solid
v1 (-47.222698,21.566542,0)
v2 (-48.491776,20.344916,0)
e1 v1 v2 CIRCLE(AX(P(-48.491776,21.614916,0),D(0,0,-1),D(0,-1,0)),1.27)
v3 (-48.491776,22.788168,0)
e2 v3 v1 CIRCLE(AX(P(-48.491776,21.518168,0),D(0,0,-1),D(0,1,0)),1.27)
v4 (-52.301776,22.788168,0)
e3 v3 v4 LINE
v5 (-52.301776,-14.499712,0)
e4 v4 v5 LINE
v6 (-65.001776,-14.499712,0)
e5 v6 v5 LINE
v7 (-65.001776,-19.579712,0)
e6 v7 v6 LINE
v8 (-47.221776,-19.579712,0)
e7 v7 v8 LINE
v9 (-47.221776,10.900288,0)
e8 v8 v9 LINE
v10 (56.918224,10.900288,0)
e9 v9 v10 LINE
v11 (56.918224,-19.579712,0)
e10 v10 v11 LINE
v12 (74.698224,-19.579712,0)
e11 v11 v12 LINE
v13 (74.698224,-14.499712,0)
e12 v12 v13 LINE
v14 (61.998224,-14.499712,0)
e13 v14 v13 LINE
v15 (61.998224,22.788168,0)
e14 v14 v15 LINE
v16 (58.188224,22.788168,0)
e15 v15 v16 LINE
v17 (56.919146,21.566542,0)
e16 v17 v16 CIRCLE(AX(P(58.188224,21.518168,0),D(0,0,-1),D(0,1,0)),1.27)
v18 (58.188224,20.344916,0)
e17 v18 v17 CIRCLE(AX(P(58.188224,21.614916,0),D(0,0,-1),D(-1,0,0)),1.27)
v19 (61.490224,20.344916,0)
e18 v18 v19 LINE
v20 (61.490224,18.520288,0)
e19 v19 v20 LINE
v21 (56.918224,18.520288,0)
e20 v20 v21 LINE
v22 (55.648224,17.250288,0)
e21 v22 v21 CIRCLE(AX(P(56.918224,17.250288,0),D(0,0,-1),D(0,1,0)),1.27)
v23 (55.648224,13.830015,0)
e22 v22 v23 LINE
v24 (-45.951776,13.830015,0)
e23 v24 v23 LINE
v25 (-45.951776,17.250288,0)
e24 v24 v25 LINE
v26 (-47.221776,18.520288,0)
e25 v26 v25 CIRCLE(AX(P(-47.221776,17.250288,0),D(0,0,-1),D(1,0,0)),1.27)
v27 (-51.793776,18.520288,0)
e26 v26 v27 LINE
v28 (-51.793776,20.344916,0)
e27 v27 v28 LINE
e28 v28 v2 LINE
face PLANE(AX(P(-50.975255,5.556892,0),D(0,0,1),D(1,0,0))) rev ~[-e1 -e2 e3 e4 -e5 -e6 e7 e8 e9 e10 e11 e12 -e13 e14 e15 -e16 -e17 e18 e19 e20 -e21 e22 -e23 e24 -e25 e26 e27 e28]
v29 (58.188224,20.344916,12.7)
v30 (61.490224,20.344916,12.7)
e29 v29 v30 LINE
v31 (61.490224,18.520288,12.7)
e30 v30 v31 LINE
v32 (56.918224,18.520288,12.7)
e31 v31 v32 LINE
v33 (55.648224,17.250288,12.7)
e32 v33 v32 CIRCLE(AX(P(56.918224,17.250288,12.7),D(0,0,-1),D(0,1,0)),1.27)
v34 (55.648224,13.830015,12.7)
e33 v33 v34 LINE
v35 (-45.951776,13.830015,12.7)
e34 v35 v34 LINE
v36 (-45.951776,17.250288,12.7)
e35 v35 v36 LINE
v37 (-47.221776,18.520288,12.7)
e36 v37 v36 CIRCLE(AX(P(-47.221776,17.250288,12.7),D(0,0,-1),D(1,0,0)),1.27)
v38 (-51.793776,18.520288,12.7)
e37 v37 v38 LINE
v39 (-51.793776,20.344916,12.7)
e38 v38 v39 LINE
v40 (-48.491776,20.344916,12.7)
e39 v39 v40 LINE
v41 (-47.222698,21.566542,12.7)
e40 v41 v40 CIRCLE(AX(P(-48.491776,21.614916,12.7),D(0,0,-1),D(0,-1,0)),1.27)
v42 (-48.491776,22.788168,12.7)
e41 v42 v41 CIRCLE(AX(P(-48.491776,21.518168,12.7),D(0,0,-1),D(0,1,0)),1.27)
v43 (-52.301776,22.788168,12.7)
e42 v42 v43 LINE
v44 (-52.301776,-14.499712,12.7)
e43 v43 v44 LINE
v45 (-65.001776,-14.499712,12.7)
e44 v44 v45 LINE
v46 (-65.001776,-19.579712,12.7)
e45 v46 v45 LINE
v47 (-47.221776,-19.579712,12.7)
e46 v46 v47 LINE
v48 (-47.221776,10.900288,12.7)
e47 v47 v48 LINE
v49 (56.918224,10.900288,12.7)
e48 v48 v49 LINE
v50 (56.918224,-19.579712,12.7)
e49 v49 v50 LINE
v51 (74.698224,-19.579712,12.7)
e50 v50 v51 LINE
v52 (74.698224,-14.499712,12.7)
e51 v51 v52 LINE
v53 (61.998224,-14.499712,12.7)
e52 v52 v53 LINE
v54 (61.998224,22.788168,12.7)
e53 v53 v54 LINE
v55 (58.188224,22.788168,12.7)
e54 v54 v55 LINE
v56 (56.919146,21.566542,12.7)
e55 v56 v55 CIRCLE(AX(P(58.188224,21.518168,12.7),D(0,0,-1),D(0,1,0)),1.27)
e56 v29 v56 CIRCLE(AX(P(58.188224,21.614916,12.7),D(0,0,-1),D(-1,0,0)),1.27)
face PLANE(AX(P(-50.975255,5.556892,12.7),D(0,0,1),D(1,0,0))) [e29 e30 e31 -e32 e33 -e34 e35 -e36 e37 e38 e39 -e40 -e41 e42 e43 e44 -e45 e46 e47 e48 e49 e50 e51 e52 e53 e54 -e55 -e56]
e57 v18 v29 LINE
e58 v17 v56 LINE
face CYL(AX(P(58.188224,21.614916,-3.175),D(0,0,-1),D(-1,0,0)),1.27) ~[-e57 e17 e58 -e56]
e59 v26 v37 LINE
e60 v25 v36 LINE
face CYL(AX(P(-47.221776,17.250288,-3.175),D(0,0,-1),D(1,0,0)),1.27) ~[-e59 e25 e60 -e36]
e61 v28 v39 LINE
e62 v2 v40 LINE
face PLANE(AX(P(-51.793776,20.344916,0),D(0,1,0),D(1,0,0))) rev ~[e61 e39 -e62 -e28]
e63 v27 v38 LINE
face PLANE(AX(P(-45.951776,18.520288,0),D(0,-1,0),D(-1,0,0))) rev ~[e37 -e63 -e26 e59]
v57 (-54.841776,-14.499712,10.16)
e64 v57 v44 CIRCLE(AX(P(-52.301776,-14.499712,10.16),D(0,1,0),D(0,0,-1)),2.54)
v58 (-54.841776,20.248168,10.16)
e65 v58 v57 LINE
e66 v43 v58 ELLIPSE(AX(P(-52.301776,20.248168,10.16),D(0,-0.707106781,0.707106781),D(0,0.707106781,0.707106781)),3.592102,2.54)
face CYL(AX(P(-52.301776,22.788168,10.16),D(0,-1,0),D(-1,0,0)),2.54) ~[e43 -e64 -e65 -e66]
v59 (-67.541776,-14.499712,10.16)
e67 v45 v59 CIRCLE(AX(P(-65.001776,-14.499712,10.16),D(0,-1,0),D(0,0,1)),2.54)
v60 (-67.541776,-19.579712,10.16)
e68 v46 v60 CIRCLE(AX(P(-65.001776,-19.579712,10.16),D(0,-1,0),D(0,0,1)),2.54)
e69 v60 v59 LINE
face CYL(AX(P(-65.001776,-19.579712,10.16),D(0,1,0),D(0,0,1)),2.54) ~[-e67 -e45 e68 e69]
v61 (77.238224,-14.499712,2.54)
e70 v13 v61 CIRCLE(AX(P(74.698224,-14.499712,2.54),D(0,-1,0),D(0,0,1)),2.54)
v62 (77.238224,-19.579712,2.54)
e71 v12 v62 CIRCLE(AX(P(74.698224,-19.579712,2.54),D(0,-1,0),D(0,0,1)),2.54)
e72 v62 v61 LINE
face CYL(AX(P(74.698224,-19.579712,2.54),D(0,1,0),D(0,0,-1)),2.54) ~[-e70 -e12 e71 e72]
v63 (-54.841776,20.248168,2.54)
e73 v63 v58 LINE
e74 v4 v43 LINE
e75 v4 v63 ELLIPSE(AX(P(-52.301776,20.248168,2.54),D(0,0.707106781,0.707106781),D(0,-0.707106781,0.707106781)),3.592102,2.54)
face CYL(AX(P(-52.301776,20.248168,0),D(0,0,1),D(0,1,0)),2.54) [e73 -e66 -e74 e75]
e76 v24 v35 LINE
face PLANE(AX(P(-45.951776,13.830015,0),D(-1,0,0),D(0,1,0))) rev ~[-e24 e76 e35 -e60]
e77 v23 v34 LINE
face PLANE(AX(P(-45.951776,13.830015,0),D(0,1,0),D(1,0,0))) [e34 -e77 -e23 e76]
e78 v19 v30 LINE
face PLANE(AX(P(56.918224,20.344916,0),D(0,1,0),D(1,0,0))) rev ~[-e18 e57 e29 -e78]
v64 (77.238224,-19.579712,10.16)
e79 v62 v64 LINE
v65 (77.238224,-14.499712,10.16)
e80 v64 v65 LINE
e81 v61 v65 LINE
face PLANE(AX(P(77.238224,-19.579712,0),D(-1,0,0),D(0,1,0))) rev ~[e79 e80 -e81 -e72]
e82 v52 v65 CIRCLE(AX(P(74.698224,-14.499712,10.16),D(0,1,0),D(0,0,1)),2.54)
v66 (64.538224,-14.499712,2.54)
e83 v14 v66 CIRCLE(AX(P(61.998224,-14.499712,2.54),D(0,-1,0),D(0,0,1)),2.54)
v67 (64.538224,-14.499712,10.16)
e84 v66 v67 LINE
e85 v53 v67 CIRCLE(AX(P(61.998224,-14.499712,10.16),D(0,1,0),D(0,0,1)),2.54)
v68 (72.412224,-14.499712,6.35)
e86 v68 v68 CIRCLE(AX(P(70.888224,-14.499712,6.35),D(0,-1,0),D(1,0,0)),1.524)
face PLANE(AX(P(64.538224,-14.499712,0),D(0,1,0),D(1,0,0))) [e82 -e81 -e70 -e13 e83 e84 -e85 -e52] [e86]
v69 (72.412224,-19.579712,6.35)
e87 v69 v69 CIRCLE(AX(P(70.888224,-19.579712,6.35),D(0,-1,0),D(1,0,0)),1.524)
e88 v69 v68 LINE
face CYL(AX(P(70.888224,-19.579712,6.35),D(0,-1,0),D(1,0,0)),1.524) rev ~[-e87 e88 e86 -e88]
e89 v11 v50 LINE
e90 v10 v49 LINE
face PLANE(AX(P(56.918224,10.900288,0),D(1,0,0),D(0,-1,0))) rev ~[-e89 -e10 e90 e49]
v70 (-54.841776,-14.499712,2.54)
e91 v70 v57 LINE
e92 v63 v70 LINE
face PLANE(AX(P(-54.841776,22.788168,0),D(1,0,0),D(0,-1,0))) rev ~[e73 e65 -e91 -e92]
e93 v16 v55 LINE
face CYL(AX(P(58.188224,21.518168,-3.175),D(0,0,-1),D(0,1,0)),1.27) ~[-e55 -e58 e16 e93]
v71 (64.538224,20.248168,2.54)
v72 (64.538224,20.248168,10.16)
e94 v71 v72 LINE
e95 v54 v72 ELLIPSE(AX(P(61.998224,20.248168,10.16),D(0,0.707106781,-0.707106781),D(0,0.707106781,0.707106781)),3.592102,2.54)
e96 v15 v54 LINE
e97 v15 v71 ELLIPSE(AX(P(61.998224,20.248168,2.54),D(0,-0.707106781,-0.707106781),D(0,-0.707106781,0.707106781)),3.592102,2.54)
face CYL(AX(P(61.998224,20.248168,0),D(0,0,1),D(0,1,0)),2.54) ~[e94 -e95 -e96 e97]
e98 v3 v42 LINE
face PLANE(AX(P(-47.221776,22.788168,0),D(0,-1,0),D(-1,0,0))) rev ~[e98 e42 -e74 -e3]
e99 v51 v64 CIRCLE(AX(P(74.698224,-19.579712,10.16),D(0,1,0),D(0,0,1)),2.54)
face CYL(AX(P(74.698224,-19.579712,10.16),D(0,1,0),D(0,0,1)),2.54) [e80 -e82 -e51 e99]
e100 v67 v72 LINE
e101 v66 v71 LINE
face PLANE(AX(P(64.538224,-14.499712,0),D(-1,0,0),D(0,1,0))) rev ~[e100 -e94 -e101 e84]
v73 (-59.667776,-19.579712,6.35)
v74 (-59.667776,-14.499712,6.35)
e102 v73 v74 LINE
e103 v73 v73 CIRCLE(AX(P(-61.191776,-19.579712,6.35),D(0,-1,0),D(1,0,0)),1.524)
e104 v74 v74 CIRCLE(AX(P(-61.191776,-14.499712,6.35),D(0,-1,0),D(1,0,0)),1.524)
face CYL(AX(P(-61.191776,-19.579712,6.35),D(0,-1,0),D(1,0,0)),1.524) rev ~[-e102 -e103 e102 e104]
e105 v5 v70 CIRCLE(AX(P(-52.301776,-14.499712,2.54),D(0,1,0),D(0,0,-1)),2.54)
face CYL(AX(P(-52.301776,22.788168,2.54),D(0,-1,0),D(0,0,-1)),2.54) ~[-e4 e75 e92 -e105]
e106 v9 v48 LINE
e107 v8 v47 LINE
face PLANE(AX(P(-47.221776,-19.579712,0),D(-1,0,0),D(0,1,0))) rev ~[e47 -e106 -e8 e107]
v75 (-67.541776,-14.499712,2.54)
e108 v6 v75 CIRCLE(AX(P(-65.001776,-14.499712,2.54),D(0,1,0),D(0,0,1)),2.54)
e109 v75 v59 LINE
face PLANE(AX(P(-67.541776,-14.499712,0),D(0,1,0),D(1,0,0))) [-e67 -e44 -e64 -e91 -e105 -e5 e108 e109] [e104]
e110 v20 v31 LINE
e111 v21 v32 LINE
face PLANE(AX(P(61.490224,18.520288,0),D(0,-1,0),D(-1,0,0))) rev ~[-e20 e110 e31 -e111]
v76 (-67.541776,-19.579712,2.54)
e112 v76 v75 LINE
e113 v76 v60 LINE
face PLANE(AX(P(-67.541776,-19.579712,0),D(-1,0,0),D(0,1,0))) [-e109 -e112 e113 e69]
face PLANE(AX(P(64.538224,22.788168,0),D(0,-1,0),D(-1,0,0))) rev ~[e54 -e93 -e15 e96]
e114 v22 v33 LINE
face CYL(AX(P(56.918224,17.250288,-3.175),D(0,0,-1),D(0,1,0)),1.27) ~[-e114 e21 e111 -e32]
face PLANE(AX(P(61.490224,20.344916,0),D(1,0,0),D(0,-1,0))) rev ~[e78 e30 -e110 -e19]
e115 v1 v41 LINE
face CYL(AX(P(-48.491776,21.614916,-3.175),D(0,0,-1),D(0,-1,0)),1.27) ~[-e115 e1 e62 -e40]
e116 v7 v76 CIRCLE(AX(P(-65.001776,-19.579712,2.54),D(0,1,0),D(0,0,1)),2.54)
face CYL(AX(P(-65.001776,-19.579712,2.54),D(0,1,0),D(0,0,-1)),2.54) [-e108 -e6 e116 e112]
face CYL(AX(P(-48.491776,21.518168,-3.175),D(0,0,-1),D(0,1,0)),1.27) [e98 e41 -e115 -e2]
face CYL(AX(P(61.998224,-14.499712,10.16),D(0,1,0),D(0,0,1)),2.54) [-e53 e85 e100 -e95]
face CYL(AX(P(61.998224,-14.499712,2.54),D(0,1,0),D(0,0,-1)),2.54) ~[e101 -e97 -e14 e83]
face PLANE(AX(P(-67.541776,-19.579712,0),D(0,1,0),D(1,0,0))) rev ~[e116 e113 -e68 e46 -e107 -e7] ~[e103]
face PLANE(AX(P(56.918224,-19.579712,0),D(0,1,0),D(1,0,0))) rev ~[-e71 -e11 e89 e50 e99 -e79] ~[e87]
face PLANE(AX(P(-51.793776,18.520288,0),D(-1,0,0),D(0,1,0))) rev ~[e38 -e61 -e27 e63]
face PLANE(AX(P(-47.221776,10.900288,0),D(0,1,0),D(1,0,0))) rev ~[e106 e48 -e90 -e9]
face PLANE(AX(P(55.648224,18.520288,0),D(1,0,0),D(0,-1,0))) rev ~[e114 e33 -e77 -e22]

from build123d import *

# Parameters (mm, degrees)
F0_W        = 7.62
F0_H        = 5.08
F0_W_2      = 12.7
F0_W_3      = 1.27
F0_H_2      = 4.6902727336
F0_H_3      = 2.9297272664
F0_W_4      = 101.6
F1_DEPTH    = 12.7
F2_T1_DEPTH = 19.05
F3_R        = 1.524
F4_DEPTH    = 25.4
F5_R        = 2.54


# Not quite as in the source:
# - a fillet or chamfer that OpenCascade refuses, or shapes differently, is made with other operations: its cross-section is extruded or revolved along the edge and cut away or added


with BuildPart() as f1:
    # F0 (on Top) → F1 (new body)
    with BuildSketch(Plane.XY):
        Polygon((-47.2217758975, 22.7881683916), (-54.8417758975, 22.7881683916), (-54.8417758975, -14.4997123967), (-47.2217758975, -14.4997123967), (-47.2217758975, 10.9002876033), (-47.2217758975, 13.8300148697), (-47.2217758975, 18.5202876033), (-51.7937758975, 18.5202876033), (-51.7937758975, 20.344916165), (-47.2217758975, 20.344916165), align=None)
        with Locations((-51.0317758975, -17.0397123967)):
            Rectangle(F0_W, F0_H)
        with Locations((-61.1917758975, -17.0397123967)):
            Rectangle(F0_W_2, F0_H)
        Polygon((64.5382241025, 22.7881683916), (56.9182241025, 22.7881683916), (56.9182241025, 20.344916165), (61.4902241025, 20.344916165), (61.4902241025, 18.5202876033), (56.9182241025, 18.5202876033), (56.9182241025, 13.8300148697), (56.9182241025, 10.9002876033), (56.9182241025, -14.4997123967), (64.5382241025, -14.4997123967), align=None)
        with Locations((-46.5867758975, 16.1751512365)):
            Rectangle(F0_W_3, F0_H_2)
        with Locations((60.7282241025, -17.0397123967)):
            Rectangle(F0_W, F0_H)
        with Locations((-46.5867758975, 12.3651512365)):
            Rectangle(F0_W_3, F0_H_3)
        with Locations((70.8882241025, -17.0397123967)):
            Rectangle(F0_W_2, F0_H)
        with Locations((56.2832241025, 16.1751512365)):
            Rectangle(F0_W_3, F0_H_2)
        with Locations((56.2832241025, 12.3651512365)):
            Rectangle(F0_W_3, F0_H_3)
        with Locations((4.8482241025, 12.3651512365)):
            Rectangle(F0_W_4, F0_H_3)
    extrude(amount=F1_DEPTH)

    # F2: fillet of radius 1.27 on 6 edges, made by hand

    # F2_s2 → F2_t1 (cut)
    with BuildSketch(Plane.XY.offset(-3.175)):
        with BuildLine():
            ThreePointArc((-48.4917758975, 22.7881683916), (-47.5937502854, 22.4161940037), (-47.2217758975, 21.5181683916))
            Line((-47.2217758975, 21.5181683916), (-47.2217758975, 22.7881683916))
            Line((-47.2217758975, 22.7881683916), (-48.4917758975, 22.7881683916))
        make_face()
        with BuildLine():
            ThreePointArc((-45.9517758975, 17.2502876033), (-46.3237502854, 18.1483132154), (-47.2217758975, 18.5202876033))
            Line((-47.2217758975, 18.5202876033), (-45.9517758975, 18.5202876033))
            Line((-45.9517758975, 18.5202876033), (-45.9517758975, 17.2502876033))
        make_face()
        with BuildLine():
            ThreePointArc((-48.4917758975, 20.344916165), (-47.5937502854, 20.7168905529), (-47.2217758975, 21.614916165))
            Line((-47.2217758975, 21.614916165), (-47.2217758975, 20.344916165))
            Line((-47.2217758975, 20.344916165), (-48.4917758975, 20.344916165))
        make_face()
        with BuildLine():
            ThreePointArc((56.9182241025, 18.5202876033), (56.0201984904, 18.1483132154), (55.6482241025, 17.2502876033))
            Line((55.6482241025, 17.2502876033), (55.6482241025, 18.5202876033))
            Line((55.6482241025, 18.5202876033), (56.9182241025, 18.5202876033))
        make_face()
        with BuildLine():
            ThreePointArc((56.9182241025, 21.614916165), (57.2901984904, 20.7168905529), (58.1882241025, 20.344916165))
            Line((58.1882241025, 20.344916165), (56.9182241025, 20.344916165))
            Line((56.9182241025, 20.344916165), (56.9182241025, 21.614916165))
        make_face()
        with BuildLine():
            ThreePointArc((58.1882241025, 22.7881683916), (57.2901984904, 22.4161940037), (56.9182241025, 21.5181683916))
            Line((56.9182241025, 21.5181683916), (56.9182241025, 22.7881683916))
            Line((56.9182241025, 22.7881683916), (58.1882241025, 22.7881683916))
        make_face()
    extrude(amount=F2_T1_DEPTH, mode=Mode.SUBTRACT)

    # F3 (on face) → F4 (cut)
    with BuildSketch(Plane.XZ.offset(19.5797123967)):
        with Locations((-61.1917758975, 6.35)):
            Circle(F3_R)
        with Locations((70.8882241025, 6.35)):
            Circle(F3_R)
    extrude(amount=-F4_DEPTH, mode=Mode.SUBTRACT)

    # F5
    f5_edges = [f1.edges().sort_by_distance(p)[0] for p in [
        (77.238224, -17.039712, 12.7),
        (77.238224, -17.039712, 0),
        (64.538224, 22.788168, 6.35),
        (-54.841776, 22.788168, 6.35),
        (-67.541776, -17.039712, 0),
        (-67.541776, -17.039712, 12.7),
        (-54.841776, 4.144228, 0),
        (-54.841776, 4.144228, 12.7),
        (64.538224, 4.144228, 0),
        (64.538224, 4.144228, 12.7),
    ]]
    fillet(f5_edges, radius=F5_R)


solid = f1.part
